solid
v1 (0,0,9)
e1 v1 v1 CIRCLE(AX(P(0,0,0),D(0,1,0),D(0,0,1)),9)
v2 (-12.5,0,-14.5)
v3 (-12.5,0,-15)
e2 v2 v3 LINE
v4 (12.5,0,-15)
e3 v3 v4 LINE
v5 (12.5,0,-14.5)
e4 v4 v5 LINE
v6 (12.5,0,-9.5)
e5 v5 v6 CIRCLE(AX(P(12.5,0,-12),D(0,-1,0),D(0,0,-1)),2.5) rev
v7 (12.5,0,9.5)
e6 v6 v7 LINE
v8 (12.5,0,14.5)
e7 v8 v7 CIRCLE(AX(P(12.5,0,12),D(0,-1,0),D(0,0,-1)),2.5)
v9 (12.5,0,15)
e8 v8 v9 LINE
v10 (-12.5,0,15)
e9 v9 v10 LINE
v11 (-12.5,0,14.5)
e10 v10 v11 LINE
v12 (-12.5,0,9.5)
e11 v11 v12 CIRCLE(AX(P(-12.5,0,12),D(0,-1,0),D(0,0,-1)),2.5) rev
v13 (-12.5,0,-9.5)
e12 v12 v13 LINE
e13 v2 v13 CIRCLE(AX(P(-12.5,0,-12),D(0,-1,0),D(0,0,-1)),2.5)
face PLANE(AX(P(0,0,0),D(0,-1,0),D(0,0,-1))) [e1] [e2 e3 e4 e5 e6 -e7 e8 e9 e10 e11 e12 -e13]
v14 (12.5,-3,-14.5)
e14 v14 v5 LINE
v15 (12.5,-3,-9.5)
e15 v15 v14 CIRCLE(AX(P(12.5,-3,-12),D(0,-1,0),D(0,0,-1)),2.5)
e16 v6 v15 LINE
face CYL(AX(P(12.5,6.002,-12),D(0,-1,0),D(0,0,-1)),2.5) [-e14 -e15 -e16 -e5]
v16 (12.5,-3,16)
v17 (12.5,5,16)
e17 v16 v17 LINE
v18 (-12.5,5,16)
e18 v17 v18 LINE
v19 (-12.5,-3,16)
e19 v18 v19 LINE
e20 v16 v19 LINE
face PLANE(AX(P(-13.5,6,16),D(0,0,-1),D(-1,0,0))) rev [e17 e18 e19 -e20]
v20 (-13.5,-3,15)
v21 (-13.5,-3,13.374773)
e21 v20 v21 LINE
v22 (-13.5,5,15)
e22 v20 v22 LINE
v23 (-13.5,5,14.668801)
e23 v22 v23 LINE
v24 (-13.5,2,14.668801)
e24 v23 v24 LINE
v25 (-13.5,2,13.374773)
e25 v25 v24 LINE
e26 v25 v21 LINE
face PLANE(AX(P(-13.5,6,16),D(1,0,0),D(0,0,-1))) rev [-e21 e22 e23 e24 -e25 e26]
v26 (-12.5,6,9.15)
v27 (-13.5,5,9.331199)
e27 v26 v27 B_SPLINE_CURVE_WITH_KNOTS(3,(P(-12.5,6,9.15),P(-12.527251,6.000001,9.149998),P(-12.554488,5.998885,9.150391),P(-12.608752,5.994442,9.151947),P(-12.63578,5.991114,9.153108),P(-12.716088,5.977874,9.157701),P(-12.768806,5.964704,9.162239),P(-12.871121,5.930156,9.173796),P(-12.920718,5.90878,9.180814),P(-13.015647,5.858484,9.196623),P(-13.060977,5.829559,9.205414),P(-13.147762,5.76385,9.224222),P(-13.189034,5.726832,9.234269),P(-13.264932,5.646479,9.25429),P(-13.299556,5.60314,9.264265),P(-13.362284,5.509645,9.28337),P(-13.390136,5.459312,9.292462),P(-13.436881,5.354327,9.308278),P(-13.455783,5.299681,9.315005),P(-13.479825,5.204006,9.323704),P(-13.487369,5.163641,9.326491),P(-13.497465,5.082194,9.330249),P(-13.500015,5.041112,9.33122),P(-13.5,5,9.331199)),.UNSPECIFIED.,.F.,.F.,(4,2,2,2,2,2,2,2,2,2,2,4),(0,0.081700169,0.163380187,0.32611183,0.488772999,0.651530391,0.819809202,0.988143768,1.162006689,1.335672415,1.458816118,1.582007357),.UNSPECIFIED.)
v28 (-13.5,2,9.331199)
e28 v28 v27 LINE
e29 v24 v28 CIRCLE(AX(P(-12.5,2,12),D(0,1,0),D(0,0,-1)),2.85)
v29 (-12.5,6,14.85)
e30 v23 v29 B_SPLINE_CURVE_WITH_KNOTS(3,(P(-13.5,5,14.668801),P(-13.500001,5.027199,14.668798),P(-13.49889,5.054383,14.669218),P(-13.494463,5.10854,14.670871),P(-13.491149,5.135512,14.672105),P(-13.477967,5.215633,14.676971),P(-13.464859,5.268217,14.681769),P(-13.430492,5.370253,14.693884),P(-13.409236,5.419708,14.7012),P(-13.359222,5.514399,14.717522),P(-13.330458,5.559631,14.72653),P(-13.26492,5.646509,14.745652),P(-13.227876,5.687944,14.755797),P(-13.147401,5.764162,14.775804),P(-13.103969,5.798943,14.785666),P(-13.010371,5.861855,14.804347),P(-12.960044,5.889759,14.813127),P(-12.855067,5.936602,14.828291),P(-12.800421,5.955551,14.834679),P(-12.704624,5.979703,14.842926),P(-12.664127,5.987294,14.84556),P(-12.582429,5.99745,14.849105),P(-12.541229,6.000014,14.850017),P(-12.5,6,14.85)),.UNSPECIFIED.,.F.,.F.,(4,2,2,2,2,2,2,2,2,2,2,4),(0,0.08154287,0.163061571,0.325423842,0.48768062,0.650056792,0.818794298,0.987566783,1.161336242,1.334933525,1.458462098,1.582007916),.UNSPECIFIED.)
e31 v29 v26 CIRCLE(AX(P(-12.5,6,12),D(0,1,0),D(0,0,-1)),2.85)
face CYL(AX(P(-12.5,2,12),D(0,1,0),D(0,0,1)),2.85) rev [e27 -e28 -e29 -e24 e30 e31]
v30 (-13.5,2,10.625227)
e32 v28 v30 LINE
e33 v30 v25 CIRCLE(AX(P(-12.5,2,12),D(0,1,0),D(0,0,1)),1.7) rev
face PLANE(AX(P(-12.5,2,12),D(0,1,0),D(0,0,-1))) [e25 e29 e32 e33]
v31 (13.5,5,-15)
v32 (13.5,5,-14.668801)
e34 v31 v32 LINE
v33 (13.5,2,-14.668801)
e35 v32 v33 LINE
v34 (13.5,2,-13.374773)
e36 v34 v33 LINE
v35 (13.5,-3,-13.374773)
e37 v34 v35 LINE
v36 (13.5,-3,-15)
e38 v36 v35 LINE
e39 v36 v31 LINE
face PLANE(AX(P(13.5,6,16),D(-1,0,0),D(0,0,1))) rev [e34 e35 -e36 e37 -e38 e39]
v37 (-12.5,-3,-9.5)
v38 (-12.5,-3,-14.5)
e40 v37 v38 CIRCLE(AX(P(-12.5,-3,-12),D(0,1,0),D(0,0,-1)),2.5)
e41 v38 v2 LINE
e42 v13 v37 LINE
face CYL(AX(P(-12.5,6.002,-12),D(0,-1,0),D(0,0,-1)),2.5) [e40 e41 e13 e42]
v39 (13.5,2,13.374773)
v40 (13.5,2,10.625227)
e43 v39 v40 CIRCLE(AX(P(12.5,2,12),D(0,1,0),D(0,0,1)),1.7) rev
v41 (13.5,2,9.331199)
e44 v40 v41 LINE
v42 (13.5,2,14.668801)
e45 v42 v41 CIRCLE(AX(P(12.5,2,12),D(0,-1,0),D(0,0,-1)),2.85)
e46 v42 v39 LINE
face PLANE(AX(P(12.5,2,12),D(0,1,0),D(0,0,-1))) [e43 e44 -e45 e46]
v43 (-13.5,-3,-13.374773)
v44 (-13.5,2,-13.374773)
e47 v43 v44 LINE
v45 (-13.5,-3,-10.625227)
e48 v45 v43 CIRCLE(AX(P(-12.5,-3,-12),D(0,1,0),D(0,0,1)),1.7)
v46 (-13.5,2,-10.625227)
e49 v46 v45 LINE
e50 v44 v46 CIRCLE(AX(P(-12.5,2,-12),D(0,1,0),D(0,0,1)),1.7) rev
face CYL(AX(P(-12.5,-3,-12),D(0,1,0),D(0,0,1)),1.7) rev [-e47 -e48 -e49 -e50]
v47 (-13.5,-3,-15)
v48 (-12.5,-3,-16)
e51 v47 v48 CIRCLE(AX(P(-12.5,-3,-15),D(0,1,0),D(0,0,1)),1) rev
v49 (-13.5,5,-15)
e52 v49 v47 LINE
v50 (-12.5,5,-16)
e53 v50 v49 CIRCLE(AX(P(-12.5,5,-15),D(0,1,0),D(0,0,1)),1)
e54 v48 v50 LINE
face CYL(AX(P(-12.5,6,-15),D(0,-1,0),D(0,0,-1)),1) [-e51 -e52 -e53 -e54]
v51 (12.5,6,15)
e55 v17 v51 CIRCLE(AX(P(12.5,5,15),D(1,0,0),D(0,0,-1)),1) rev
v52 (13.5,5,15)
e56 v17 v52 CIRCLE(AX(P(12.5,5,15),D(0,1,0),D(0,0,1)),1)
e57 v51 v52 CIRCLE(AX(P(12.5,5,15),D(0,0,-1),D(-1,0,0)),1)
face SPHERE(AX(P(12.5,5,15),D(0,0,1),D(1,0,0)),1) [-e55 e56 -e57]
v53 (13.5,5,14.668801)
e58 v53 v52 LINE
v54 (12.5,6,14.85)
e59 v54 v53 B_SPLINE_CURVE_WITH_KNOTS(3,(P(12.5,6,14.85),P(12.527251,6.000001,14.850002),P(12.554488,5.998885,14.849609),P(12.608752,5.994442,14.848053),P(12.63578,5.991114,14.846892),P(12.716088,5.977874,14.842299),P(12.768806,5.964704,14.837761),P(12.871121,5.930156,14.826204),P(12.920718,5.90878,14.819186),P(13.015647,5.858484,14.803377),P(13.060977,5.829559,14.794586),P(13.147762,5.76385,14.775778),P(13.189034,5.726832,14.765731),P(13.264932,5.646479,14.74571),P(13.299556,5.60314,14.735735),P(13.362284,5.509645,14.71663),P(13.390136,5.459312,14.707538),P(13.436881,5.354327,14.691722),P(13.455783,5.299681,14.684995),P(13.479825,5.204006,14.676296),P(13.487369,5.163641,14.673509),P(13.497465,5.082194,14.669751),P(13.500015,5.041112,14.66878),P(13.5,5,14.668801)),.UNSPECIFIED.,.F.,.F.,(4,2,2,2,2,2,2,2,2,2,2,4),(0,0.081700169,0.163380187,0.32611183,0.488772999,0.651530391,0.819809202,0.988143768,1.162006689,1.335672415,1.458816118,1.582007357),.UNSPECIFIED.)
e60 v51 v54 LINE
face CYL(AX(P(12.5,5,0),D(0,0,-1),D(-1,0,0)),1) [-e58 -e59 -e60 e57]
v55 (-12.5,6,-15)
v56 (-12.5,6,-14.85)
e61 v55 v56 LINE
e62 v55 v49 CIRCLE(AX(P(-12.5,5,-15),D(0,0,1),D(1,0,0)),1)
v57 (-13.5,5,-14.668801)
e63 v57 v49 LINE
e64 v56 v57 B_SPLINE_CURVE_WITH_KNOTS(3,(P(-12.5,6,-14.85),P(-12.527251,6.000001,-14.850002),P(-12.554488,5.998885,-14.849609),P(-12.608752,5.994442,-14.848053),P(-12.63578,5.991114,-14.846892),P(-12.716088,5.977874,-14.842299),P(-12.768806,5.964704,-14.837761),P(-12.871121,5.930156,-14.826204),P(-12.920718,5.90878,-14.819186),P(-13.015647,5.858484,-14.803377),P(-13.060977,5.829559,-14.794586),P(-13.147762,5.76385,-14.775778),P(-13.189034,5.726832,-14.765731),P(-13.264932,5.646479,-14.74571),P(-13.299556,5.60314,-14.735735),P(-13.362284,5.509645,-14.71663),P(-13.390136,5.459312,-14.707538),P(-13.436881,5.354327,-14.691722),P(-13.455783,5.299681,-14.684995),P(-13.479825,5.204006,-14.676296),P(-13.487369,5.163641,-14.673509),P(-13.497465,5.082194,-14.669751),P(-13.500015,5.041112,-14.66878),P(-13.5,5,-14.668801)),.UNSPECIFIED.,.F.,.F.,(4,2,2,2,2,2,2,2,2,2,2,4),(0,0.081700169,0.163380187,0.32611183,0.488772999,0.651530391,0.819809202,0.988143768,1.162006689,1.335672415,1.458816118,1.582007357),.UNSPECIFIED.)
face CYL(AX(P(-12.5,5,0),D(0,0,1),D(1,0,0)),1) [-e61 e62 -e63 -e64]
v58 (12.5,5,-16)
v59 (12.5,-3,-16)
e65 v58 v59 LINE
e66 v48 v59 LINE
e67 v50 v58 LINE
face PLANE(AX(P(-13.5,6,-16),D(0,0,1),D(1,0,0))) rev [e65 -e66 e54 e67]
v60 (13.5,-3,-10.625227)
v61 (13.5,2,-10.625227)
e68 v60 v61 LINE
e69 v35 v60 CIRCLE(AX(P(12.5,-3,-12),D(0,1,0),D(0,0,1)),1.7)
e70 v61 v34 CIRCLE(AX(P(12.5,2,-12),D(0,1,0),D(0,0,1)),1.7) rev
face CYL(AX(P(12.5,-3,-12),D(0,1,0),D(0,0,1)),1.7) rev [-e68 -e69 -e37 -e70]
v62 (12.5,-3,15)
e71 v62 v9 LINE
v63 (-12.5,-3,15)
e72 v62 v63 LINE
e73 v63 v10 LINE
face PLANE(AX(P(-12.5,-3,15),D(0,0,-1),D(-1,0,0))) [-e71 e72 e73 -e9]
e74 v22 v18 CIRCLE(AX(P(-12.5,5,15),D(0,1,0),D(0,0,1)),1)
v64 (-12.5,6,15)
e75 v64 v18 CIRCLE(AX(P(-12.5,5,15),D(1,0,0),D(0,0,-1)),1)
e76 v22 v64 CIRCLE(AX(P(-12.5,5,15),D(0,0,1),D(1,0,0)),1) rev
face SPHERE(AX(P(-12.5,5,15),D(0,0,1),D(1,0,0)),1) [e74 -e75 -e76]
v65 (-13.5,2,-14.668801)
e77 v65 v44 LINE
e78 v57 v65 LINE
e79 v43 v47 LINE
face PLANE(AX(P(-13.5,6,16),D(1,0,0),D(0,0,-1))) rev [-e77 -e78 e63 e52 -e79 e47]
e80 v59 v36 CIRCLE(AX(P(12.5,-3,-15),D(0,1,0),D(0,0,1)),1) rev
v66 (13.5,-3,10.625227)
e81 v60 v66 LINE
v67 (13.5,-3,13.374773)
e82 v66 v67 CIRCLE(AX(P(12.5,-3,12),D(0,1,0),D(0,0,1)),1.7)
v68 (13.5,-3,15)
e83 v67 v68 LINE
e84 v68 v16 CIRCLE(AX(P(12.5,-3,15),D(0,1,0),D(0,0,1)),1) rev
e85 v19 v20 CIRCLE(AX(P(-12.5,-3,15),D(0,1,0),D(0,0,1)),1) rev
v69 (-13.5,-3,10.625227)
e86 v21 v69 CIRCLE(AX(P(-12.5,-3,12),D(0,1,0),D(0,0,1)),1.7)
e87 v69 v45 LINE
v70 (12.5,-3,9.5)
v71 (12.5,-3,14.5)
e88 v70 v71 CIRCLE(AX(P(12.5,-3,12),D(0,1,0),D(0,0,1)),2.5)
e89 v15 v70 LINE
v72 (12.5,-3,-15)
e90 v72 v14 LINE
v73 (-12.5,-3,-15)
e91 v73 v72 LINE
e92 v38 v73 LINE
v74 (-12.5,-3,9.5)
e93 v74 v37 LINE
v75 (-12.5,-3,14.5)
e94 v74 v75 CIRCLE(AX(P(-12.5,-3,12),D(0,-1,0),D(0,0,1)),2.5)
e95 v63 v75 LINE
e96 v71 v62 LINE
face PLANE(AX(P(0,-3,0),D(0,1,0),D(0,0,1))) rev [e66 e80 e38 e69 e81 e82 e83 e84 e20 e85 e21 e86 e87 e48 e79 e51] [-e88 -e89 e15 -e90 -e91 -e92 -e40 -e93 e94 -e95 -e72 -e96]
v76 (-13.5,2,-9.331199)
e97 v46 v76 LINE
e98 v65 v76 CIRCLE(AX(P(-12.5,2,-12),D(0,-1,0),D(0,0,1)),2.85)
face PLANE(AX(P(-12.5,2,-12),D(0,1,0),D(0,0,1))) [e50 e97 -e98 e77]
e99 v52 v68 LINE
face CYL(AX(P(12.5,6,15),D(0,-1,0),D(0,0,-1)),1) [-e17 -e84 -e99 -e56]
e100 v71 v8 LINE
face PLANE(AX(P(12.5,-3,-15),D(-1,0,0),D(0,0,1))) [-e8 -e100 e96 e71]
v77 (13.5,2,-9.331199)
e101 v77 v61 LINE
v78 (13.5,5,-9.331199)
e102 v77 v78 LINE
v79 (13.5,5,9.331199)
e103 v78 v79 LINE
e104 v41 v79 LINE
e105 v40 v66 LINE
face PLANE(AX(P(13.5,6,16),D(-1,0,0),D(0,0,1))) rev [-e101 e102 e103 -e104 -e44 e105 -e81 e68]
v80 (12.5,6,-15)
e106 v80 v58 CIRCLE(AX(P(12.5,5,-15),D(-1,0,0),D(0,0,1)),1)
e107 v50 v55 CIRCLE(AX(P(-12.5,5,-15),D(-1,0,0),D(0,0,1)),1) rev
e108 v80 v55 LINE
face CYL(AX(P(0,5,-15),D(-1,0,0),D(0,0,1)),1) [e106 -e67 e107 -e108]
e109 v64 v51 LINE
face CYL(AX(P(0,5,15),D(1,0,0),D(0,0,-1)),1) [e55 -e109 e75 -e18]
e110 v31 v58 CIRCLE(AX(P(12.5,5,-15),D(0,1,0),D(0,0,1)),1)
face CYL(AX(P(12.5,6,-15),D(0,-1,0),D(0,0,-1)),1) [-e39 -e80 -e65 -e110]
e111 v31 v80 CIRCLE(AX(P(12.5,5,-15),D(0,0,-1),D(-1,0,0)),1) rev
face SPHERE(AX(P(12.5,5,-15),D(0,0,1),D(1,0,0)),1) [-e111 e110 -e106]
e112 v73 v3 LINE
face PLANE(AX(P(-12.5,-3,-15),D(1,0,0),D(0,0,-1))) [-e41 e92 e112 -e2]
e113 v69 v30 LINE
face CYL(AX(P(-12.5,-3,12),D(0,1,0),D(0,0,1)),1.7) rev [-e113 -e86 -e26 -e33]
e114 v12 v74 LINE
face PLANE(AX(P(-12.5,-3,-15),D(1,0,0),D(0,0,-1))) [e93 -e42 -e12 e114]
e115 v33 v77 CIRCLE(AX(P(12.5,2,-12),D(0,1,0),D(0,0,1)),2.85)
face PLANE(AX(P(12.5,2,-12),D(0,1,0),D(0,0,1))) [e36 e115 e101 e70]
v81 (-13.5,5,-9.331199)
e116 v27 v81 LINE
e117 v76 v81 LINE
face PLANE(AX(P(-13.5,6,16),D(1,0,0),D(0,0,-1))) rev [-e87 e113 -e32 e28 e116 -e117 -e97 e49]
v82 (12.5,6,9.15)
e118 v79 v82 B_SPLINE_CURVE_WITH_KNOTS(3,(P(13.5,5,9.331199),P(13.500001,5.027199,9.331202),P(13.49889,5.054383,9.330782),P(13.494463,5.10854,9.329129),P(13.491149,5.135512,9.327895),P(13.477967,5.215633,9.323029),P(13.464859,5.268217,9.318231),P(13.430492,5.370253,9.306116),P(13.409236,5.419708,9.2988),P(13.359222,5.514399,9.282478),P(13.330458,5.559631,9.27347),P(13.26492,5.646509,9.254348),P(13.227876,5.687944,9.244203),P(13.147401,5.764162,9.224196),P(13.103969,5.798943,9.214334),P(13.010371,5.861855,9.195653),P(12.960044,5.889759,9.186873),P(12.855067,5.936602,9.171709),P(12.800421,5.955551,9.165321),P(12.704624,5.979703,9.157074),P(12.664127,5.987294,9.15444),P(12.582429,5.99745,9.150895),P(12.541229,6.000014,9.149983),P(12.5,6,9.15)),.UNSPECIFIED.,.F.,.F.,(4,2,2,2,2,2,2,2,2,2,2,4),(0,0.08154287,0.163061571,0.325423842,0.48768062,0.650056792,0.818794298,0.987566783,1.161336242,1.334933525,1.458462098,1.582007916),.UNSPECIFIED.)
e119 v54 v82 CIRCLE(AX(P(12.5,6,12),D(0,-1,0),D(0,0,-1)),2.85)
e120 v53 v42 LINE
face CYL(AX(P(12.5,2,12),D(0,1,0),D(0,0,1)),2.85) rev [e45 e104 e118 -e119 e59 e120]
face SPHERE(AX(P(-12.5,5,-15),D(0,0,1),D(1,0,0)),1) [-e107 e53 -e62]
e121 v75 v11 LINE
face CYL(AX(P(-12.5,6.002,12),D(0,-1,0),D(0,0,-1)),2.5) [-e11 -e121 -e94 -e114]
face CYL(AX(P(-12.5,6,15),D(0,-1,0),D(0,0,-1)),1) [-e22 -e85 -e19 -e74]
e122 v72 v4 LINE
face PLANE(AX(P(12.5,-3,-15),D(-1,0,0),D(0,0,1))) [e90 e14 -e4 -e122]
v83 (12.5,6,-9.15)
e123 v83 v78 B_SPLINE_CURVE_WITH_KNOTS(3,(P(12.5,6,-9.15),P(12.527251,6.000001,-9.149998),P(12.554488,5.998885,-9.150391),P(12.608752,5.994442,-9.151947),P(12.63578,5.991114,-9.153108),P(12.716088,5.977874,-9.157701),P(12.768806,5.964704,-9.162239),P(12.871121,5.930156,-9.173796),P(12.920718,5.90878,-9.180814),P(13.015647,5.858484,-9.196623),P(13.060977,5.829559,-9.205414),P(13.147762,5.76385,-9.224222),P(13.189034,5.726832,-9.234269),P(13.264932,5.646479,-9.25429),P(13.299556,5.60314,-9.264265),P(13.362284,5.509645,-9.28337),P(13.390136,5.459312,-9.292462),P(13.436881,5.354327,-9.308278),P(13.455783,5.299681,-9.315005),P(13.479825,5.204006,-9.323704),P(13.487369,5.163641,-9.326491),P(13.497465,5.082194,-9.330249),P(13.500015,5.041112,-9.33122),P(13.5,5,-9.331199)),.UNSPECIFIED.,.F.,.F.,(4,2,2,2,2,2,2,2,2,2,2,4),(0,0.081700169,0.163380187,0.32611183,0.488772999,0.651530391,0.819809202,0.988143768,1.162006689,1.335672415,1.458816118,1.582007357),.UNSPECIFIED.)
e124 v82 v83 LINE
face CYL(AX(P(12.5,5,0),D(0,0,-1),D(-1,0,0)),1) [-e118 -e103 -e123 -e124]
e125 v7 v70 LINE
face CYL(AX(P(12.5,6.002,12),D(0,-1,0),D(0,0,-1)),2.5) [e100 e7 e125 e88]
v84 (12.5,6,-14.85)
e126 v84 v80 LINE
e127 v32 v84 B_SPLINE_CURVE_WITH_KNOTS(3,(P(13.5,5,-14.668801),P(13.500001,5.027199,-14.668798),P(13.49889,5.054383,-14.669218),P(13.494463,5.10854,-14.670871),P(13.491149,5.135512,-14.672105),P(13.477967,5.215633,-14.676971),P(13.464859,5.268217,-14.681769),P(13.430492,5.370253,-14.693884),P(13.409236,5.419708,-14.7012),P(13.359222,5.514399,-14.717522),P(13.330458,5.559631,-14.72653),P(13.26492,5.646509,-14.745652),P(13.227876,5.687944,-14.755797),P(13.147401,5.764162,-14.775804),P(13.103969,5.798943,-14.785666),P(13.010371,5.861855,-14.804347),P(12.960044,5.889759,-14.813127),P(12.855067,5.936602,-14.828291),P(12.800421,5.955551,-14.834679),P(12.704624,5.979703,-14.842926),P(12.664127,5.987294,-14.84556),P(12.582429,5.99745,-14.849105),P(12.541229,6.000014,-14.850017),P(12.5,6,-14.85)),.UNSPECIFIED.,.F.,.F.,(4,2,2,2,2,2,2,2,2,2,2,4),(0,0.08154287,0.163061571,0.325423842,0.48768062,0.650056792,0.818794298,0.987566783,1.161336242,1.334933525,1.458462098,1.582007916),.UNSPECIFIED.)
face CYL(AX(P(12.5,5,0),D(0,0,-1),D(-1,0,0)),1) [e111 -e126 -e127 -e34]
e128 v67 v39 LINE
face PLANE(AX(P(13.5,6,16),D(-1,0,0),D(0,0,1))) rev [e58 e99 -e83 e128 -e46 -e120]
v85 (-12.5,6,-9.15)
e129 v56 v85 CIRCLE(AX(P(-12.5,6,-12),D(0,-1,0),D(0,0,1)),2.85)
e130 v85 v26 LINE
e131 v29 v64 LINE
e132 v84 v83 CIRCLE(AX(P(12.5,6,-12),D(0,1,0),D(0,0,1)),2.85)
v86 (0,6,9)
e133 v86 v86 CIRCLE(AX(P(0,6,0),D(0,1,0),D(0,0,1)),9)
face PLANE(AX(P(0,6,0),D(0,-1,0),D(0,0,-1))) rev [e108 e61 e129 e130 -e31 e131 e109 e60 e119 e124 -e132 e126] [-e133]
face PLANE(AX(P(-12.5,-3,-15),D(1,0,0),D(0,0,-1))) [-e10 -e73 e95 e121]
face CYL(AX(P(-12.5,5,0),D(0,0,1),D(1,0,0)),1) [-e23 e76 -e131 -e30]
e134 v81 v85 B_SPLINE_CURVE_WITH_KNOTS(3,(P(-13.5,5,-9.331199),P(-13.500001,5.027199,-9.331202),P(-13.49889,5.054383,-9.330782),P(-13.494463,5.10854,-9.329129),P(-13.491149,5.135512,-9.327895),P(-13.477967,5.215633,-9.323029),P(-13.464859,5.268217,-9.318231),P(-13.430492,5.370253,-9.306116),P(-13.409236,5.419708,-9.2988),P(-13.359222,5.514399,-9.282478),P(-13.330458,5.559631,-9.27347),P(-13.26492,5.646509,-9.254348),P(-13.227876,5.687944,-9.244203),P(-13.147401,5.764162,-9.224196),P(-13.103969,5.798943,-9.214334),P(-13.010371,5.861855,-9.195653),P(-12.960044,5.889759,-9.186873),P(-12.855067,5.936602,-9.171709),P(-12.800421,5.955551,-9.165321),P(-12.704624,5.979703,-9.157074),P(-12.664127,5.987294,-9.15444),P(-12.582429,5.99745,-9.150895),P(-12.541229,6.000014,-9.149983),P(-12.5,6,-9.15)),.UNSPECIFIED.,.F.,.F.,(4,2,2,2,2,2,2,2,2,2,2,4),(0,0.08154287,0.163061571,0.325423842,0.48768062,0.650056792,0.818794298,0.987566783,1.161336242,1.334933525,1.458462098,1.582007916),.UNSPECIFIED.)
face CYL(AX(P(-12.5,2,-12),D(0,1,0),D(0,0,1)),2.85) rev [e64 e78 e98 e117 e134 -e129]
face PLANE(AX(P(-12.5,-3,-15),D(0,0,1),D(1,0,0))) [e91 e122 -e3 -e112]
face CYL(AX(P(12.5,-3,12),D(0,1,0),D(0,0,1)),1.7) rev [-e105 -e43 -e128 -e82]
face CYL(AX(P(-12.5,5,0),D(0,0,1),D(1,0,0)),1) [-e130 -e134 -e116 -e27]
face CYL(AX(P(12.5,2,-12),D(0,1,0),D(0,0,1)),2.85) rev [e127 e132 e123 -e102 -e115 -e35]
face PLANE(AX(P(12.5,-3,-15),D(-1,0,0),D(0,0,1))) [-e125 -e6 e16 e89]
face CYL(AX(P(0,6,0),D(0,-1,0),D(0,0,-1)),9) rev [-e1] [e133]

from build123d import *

# Parameters (mm, degrees)
SKETCH2_W               = 27
SKETCH2_H               = 32
SKETCH2_R               = 9
BOSS_EXTRUDE1_DEPTH     = 6
SKETCH3_W               = 27
SKETCH3_H               = 32
SKETCH3_W_2             = 25
SKETCH3_H_2             = 30
BOSS_EXTRUDE2_DEPTH     = 3
CUT_EXTRUDE1_DEPTH      = 22.77728174
CUT_EXTRUDE1_DEPTH_BACK = 22.77728174
SKETCH1_R               = 1.7
BOSS_EXTRUDE4_REACH     = 24.787
MIRROR2_COPY_1_REACH    = 24.787
SKETCH6_R               = 2.85
CUT_EXTRUDE2_DEPTH      = 4
MIRROR4_COPY_1_SKETCH_R = 2.85
MIRROR4_COPY_1_DEPTH    = 4
FILLET1_R               = 1
FILLET4_R               = 1


with BuildPart() as part:
    # Sketch2 → Boss-Extrude1 (new body)
    with BuildSketch(Plane(origin=(0, 0, 0), x_dir=(1, 0, 0), z_dir=(0, 1, 0))):
        Rectangle(SKETCH2_W, SKETCH2_H)
        with Locations(Location((0, 0, 0), (0, 0, 270))):
            Circle(SKETCH2_R, mode=Mode.SUBTRACT)
    extrude(amount=BOSS_EXTRUDE1_DEPTH)

    # Sketch3 → Boss-Extrude2 (add)
    with BuildSketch(Plane.XZ):
        Rectangle(SKETCH3_W, SKETCH3_H)
        Rectangle(SKETCH3_W_2, SKETCH3_H_2, mode=Mode.SUBTRACT)
    extrude(amount=BOSS_EXTRUDE2_DEPTH)

    # Sketch1 → Cut-Extrude1 (cut, two sides: drawn at the far end of the back side and taken through both)
    with BuildSketch(Plane(origin=(0, 0, 0), x_dir=(1, 0, 0), z_dir=(0, 1, 0)).offset(-CUT_EXTRUDE1_DEPTH_BACK)):
        with Locations((-12.5, 12)):
            Circle(SKETCH1_R)
        with Locations((12.5, 12)):
            Circle(SKETCH1_R)
        with Locations((-12.5, -12)):
            Circle(SKETCH1_R)
        with Locations((12.5, -12)):
            Circle(SKETCH1_R)
    extrude(amount=CUT_EXTRUDE1_DEPTH + CUT_EXTRUDE1_DEPTH_BACK, mode=Mode.SUBTRACT)

    # Sketch5 → Boss-Extrude4 (add, up to next)
    with BuildSketch(Plane.XZ.offset(3), mode=Mode.PRIVATE) as boss_extrude4_sk1:
        with BuildLine():
            Line((13.5, -10.625227292), (13.5, -9.708712153))
            ThreePointArc((13.5, -9.708712153), (10, -12), (13.5, -14.291287847))
            Line((13.5, -14.291287847), (13.5, -13.374772708))
            ThreePointArc((13.5, -13.374772708), (10.8, -12), (13.5, -10.625227292))
        make_face()
    boss_extrude4_tool1 = extrude(boss_extrude4_sk1.sketch, amount=-BOSS_EXTRUDE4_REACH, mode=Mode.PRIVATE) - part.part
    boss_extrude4 = boss_extrude4_tool1.solids().sort_by_distance((13.438967, -3, -10.16697))[0]
    add(boss_extrude4)

    # Mirror1: Boss-Extrude4 across plane
    add(boss_extrude4.mirror(Plane(origin=(0, 0, 0), x_dir=(0, 0, 1), z_dir=(1, 0, 0))))

    # Mirror2: Boss-Extrude4 across plane
    add(boss_extrude4.mirror(Plane.XY))

    # Mirror2 copy 1 sketch → Mirror2 copy 1 (add, up to next)
    with BuildSketch(Plane(origin=(0, -3, 0), x_dir=(-1, 0, 0), z_dir=(0, -1, 0)), mode=Mode.PRIVATE) as mirror2_copy_1_sk1:
        with BuildLine():
            Line((13.5, -10.625227292), (13.5, -9.708712153))
            ThreePointArc((13.5, -9.708712153), (10, -12), (13.5, -14.291287847))
            Line((13.5, -14.291287847), (13.5, -13.374772708))
            ThreePointArc((13.5, -13.374772708), (10.8, -12), (13.5, -10.625227292))
        make_face()
    mirror2_copy_1_tool1 = extrude(mirror2_copy_1_sk1.sketch, amount=-MIRROR2_COPY_1_REACH, mode=Mode.PRIVATE) - part.part
    add(mirror2_copy_1_tool1.solids().sort_by_distance((-13.438967, -3, 10.16697))[0])

    # Sketch6 → Cut-Extrude2 (cut)
    with BuildSketch(Plane(origin=(0, 6, 0), x_dir=(1, 0, 0), z_dir=(0, 1, 0))):
        with Locations((12.5, 12)):
            Circle(SKETCH6_R)
    cut_extrude2 = extrude(amount=-CUT_EXTRUDE2_DEPTH, mode=Mode.SUBTRACT)

    # Mirror3: Cut-Extrude2 across plane
    add(cut_extrude2.mirror(Plane(origin=(0, 0, 0), x_dir=(0, 0, 1), z_dir=(1, 0, 0))), mode=Mode.SUBTRACT)

    # Mirror4: Cut-Extrude2 across plane
    add(cut_extrude2.mirror(Plane.XY), mode=Mode.SUBTRACT)

    # Mirror4 copy 1 sketch → Mirror4 copy 1 (cut)
    with BuildSketch(Plane(origin=(0, 6, 0), x_dir=(-1, 0, 0), z_dir=(0, 1, 0))):
        with Locations((12.5, 12)):
            Circle(MIRROR4_COPY_1_SKETCH_R)
    extrude(amount=-MIRROR4_COPY_1_DEPTH, mode=Mode.SUBTRACT)

    # Fillet1
    fillet1_edges = [part.edges().sort_by_distance(p)[0] for p in [
        (-13.5, 6, -15.334400615),
        (13.5, 6, -15.334400615),
        (0, 6, 16),
        (-13.5, 6, 0),
        (13.5, 6, 0),
        (-13.5, 6, 15.334400615),
        (13.5, 6, 15.334400615),
        (0, 6, -16),
    ]]
    fillet(fillet1_edges, radius=FILLET1_R)

    # Fillet4
    # the kernel refuses this fillet: 1 mm, written as the material it takes off along each edge
    with BuildSketch(Plane(origin=(-12.5, 5, -15), x_dir=(0, 0, -1), z_dir=(-1, 0, 0))) as fillet4_piece_1_section:
        Polygon((0, 0), (FILLET4_R, 0), (FILLET4_R, -FILLET4_R), (0, -FILLET4_R), align=None)
    fillet4_piece_1 = extrude(amount=FILLET4_R, mode=Mode.PRIVATE)
    fillet4_piece_1 = fillet4_piece_1 - Plane(origin=(-12.5, 5, -15), x_dir=(0, -0.7071067811865475, 0.7071067811865475), z_dir=(-1, 0, 0)) * Sphere(FILLET4_R, mode=Mode.PRIVATE)
    add(fillet4_piece_1, mode=Mode.SUBTRACT)
    with BuildSketch(Plane(origin=(12.5, 5, -15), x_dir=(1, 0, 0), z_dir=(0, 0, -1))) as fillet4_piece_2_section:
        Polygon((0, 0), (FILLET4_R, 0), (FILLET4_R, -FILLET4_R), (0, -FILLET4_R), align=None)
    fillet4_piece_2 = extrude(amount=FILLET4_R, mode=Mode.PRIVATE)
    fillet4_piece_2 = fillet4_piece_2 - Plane(origin=(12.5, 5, -15), x_dir=(-0.7071067811865475, -0.7071067811865475, 0), z_dir=(0, 0, -1)) * Sphere(FILLET4_R, mode=Mode.PRIVATE)
    add(fillet4_piece_2, mode=Mode.SUBTRACT)
    with BuildSketch(Plane(origin=(-12.5, 5, 15), x_dir=(-1, 0, 0), z_dir=(0, 0, 1))) as fillet4_piece_3_section:
        Polygon((0, 0), (FILLET4_R, 0), (FILLET4_R, -FILLET4_R), (0, -FILLET4_R), align=None)
    fillet4_piece_3 = extrude(amount=FILLET4_R, mode=Mode.PRIVATE)
    fillet4_piece_3 = fillet4_piece_3 - Plane(origin=(-12.5, 5, 15), x_dir=(0.7071067811865475, -0.7071067811865475, 0), z_dir=(0, 0, 1)) * Sphere(FILLET4_R, mode=Mode.PRIVATE)
    add(fillet4_piece_3, mode=Mode.SUBTRACT)
    with BuildSketch(Plane(origin=(12.5, 5, 15), x_dir=(1, 0, 0), z_dir=(0, 0, 1))) as fillet4_piece_4_section:
        Polygon((0, 0), (FILLET4_R, 0), (FILLET4_R, FILLET4_R), (0, FILLET4_R), align=None)
    fillet4_piece_4 = extrude(amount=FILLET4_R, mode=Mode.PRIVATE)
    fillet4_piece_4 = fillet4_piece_4 - Plane(origin=(12.5, 5, 15), x_dir=(-0.7071067811865475, -0.7071067811865475, 0), z_dir=(0, 0, 1)) * Sphere(FILLET4_R, mode=Mode.PRIVATE)
    add(fillet4_piece_4, mode=Mode.SUBTRACT)
    with BuildSketch(Plane(origin=(13.5, -5.5, -16), x_dir=(-1, 0, 0), z_dir=(0, 1, 0))) as fillet4_piece_5:
        with BuildLine():
            CenterArc((FILLET4_R, FILLET4_R), FILLET4_R, 180, 90)
            Line((0, FILLET4_R), (0, 0))
            Line((0, 0), (FILLET4_R, 0))
        make_face()
    extrude(amount=10.5, mode=Mode.SUBTRACT)
    with BuildSketch(Plane(origin=(13.5, -5.5, 16), x_dir=(-1, 0, 0), z_dir=(0, 1, 0)), Plane(origin=(-13.5, 5, 16), x_dir=(1, 0, 0), z_dir=(0, -1, 0)), Plane(origin=(-13.5, 5, -16), x_dir=(0, 0, 1), z_dir=(0, -1, 0))) as fillet4_piece_6:
        with BuildLine():
            CenterArc((FILLET4_R, -FILLET4_R), FILLET4_R, 90, 90)
            Line((0, -FILLET4_R), (0, 0))
            Line((0, 0), (FILLET4_R, 0))
        make_face()
    extrude(amount=10.5, mode=Mode.SUBTRACT)


solid = part.part
